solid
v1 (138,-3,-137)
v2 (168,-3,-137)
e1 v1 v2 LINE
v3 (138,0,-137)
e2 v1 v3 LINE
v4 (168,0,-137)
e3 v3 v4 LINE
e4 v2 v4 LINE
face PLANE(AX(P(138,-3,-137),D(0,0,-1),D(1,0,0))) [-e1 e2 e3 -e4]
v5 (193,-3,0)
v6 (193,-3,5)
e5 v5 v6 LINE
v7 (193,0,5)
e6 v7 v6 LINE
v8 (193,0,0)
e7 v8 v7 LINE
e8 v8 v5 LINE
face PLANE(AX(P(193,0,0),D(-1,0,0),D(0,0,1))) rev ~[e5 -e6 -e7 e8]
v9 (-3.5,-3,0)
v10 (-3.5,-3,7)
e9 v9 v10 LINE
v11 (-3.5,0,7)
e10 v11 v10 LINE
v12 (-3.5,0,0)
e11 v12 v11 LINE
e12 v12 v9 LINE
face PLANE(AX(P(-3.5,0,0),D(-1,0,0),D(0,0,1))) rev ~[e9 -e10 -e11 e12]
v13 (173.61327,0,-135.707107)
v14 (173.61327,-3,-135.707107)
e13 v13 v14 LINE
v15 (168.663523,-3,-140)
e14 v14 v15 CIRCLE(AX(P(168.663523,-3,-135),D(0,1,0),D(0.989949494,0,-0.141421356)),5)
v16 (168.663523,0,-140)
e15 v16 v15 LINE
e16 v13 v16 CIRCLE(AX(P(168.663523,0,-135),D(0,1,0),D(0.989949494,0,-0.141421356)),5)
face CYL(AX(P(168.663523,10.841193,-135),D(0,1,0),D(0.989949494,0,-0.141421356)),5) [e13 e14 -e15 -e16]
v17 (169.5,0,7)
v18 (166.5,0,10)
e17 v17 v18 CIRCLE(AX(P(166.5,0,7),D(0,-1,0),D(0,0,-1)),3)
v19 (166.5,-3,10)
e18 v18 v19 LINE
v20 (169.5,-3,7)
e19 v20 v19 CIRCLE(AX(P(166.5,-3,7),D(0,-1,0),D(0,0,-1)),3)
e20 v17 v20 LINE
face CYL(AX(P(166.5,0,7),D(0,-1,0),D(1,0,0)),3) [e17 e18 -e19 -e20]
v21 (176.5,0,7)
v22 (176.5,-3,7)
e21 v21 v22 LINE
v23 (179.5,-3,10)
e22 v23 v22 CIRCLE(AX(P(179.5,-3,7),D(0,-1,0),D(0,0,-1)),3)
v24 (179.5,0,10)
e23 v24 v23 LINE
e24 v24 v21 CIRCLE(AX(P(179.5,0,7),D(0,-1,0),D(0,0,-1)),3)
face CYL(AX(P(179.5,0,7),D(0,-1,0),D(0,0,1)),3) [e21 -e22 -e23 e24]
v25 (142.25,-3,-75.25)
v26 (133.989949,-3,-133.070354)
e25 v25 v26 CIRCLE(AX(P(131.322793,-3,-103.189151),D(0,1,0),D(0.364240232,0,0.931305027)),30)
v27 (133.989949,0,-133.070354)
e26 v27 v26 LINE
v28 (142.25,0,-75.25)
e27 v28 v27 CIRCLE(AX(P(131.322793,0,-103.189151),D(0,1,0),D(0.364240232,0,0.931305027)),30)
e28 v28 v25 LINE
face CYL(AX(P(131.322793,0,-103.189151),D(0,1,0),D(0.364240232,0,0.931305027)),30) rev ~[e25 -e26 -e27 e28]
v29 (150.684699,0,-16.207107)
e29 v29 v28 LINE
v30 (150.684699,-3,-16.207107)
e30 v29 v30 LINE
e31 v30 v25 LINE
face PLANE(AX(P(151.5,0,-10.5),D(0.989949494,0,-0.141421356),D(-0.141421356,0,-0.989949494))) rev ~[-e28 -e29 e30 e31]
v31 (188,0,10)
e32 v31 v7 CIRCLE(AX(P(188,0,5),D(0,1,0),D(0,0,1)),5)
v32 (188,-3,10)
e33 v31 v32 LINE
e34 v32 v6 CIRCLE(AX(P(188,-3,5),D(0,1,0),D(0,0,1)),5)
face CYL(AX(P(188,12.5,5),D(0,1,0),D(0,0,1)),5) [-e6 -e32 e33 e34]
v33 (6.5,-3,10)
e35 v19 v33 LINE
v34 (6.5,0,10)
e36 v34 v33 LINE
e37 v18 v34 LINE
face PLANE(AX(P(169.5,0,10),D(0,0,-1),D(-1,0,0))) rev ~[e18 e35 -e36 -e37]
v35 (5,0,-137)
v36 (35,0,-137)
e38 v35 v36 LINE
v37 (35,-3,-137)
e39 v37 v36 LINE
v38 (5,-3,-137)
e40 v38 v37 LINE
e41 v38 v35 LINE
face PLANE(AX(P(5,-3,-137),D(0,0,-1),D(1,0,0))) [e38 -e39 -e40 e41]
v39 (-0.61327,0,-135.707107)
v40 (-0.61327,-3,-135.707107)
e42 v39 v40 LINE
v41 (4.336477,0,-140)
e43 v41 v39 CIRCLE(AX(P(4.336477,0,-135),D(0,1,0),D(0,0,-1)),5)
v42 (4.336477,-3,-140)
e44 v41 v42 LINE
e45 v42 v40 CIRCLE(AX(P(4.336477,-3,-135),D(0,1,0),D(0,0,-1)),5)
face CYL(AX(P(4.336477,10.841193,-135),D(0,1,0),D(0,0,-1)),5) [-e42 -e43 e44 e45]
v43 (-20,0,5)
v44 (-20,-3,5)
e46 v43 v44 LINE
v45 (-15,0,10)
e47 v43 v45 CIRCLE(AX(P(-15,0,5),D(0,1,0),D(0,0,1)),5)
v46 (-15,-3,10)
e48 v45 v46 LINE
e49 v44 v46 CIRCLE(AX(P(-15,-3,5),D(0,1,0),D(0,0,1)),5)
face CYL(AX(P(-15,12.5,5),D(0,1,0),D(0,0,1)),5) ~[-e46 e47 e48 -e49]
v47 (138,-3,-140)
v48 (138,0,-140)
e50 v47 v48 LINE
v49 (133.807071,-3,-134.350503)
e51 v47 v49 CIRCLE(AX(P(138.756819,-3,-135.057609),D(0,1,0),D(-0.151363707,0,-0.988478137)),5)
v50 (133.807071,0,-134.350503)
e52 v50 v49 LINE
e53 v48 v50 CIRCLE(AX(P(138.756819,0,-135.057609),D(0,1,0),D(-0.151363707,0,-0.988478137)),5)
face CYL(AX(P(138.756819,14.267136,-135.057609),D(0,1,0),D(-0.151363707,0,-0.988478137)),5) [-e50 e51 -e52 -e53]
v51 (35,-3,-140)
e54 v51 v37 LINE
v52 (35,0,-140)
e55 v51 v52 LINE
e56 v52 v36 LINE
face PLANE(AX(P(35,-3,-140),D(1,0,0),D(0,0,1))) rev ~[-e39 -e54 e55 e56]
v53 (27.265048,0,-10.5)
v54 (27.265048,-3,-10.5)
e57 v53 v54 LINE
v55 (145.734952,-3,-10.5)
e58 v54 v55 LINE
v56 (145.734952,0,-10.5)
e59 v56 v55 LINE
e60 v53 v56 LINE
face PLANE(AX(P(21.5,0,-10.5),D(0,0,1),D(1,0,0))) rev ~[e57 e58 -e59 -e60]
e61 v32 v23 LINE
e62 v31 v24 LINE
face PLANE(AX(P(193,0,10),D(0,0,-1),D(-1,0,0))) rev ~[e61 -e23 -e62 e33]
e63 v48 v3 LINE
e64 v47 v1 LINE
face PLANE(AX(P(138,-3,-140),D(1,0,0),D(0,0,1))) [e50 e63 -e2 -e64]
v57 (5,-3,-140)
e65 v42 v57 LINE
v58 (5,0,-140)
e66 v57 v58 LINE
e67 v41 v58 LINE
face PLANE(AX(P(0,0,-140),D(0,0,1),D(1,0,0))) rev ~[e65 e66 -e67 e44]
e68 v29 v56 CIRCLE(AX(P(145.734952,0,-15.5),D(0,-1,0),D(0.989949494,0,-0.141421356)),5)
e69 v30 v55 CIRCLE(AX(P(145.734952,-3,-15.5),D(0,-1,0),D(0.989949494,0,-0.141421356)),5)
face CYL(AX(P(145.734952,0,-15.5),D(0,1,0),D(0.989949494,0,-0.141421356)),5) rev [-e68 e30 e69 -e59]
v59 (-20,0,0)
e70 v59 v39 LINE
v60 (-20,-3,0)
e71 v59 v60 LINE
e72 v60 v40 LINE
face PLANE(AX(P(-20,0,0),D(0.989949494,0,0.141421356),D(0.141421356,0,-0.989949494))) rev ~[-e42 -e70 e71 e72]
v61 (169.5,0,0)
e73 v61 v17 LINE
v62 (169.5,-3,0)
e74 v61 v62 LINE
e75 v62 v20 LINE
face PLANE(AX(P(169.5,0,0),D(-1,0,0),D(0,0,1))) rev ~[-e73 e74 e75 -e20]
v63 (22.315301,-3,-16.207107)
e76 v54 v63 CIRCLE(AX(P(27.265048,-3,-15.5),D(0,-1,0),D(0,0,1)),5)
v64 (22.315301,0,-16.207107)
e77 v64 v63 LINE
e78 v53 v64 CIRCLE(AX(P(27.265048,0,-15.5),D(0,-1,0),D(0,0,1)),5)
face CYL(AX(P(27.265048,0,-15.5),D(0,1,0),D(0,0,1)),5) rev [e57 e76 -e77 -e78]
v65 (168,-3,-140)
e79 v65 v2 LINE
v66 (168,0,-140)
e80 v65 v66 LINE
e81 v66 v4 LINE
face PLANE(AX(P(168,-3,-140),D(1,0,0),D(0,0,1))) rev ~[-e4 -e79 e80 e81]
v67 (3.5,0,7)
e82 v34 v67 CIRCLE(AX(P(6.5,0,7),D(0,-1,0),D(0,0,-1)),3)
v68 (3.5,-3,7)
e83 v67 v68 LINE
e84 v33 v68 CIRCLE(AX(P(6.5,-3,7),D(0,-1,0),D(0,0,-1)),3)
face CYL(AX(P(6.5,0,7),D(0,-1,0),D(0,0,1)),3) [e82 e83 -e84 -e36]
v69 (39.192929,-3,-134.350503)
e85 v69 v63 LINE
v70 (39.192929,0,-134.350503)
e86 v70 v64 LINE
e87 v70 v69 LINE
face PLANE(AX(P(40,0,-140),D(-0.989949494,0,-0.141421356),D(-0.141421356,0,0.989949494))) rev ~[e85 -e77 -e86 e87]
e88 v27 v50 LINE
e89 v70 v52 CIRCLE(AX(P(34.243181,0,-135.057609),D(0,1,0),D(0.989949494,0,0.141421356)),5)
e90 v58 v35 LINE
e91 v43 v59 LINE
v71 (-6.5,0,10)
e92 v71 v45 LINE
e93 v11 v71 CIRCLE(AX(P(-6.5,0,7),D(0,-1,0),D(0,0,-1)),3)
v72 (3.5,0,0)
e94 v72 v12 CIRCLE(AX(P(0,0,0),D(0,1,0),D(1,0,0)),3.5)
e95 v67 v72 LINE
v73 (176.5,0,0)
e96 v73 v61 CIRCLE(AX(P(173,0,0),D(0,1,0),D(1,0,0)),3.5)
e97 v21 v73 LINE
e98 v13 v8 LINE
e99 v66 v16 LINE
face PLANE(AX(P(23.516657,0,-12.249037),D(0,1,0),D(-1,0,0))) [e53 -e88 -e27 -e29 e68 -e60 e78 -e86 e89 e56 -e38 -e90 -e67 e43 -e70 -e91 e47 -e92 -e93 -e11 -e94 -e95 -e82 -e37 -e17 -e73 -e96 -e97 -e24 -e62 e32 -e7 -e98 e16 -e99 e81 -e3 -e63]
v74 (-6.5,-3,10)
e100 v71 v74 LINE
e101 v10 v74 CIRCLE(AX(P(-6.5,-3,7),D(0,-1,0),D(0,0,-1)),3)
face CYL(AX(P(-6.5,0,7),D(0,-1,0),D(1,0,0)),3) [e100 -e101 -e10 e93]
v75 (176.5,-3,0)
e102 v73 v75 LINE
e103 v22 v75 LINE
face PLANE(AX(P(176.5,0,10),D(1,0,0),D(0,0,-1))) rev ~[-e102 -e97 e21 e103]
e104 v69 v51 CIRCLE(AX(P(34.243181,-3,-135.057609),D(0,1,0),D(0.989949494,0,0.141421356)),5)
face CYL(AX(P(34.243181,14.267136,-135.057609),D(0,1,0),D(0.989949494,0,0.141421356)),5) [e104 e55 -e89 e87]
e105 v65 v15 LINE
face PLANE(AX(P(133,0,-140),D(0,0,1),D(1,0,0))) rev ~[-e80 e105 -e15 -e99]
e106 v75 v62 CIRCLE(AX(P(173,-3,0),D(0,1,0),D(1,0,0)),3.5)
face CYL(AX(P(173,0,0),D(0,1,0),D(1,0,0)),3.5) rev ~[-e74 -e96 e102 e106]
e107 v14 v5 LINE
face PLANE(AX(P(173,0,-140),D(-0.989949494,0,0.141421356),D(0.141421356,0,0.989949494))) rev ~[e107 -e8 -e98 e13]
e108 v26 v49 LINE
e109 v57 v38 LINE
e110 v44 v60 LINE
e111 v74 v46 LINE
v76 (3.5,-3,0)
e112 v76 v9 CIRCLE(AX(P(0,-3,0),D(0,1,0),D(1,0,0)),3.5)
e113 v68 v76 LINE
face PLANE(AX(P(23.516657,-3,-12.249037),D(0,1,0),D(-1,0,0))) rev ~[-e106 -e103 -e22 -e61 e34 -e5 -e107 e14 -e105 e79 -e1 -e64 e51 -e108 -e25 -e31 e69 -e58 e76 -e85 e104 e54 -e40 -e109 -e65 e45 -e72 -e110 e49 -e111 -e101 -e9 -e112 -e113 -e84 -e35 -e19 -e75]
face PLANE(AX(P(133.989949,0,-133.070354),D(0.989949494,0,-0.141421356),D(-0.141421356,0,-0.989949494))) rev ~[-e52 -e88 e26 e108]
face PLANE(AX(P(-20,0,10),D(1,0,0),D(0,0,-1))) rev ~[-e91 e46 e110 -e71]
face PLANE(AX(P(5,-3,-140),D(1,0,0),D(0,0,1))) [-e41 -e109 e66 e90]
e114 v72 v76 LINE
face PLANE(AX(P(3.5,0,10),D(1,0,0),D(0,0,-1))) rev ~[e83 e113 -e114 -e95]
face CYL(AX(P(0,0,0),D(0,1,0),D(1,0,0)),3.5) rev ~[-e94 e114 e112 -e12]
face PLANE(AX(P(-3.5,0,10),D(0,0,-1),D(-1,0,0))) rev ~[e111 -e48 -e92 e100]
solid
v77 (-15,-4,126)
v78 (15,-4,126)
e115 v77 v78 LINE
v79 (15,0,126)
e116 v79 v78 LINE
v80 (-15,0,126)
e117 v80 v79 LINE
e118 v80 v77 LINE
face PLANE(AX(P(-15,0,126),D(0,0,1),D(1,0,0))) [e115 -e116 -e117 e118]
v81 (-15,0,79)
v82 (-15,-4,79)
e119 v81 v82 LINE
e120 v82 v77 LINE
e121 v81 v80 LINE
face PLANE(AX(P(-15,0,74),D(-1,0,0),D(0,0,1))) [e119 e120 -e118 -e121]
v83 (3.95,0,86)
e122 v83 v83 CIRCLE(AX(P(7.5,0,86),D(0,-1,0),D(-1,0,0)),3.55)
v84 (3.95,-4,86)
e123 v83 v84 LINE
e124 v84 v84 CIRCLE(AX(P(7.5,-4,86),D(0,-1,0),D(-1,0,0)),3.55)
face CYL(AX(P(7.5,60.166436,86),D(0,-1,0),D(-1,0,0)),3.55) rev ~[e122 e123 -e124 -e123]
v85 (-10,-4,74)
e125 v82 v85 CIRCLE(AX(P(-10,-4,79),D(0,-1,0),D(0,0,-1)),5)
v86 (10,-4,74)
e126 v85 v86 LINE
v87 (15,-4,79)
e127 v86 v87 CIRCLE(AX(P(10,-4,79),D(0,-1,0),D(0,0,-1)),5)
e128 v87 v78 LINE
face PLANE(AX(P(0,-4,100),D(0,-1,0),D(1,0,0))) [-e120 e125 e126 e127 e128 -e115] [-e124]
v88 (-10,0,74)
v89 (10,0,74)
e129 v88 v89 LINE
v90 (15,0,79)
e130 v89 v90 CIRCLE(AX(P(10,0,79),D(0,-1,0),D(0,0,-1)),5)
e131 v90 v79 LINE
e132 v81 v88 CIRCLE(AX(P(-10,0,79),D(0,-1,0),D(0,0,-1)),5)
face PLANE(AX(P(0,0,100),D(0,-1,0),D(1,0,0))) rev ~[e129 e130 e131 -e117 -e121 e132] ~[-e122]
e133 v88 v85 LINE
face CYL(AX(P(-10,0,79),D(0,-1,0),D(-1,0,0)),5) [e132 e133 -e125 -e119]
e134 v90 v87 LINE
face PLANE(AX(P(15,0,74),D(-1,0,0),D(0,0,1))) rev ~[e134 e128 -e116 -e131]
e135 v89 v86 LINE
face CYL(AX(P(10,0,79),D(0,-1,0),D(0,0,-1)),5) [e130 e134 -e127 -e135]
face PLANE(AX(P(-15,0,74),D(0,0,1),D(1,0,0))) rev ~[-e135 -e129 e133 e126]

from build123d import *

# Parameters (mm, degrees)
F1_DEPTH     = 3
F2_W         = 30
F2_H         = 3
F3_DEPTH     = 25
F4_W         = 30
F4_H         = 52
F5_DEPTH     = 4
F6_D         = 7.1
F7_T1_DEPTH  = 3
F7_T3_DEPTH  = 3
F7_T5_DEPTH  = 28
F7_T7_DEPTH  = 28
F7_T9_DEPTH  = 24.6823850424
F7_T11_DEPTH = 31.5342712156
F7_T13_DEPTH = 31.5342712156
F7_T15_DEPTH = 24.6823850424
F8_R         = 3
F9_R         = 5


# Not quite as in the source:
# - a fillet or chamfer that OpenCascade refuses, or shapes differently, is made with other operations: its cross-section is extruded or revolved along the edge and cut away or added


with BuildPart() as f1:
    # F0 (on Front) → F1 (new body)
    with BuildSketch(Plane.XZ):
        with BuildLine():
            Line((-20, 10), (-20, 0))
            Line((-20, 0), (0, -140))
            Line((0, -140), (40, -140))
            Line((40, -140), (21.5, -10.5))
            Line((21.5, -10.5), (151.5, -10.5))
            Line((151.5, -10.5), (142.25, -75.25))
            ThreePointArc((142.25, -75.25), (161.0212778612, -107.4317915028), (133.9899494937, -133.0703535444))
            Line((133.9899494937, -133.0703535444), (133, -140))
            Line((133, -140), (173, -140))
            Line((173, -140), (193, 0))
            Line((193, 0), (193, 10))
            Line((193, 10), (176.5, 10))
            Line((176.5, 10), (176.5, 0))
            ThreePointArc((176.5, 0), (173, -3.5), (169.5, 0))
            Line((169.5, 0), (169.5, 10))
            Line((169.5, 10), (153, 10))
            Line((153, 10), (20, 10))
            Line((20, 10), (3.5, 10))
            Line((3.5, 10), (3.5, 0))
            ThreePointArc((3.5, 0), (0, -3.5), (-3.5, 0))
            Line((-3.5, 0), (-3.5, 10))
            Line((-3.5, 10), (-20, 10))
        make_face()
    extrude(amount=F1_DEPTH)

    # F2 (on face) → F3 (cut)
    with BuildSketch(Plane.XZ.offset(3)):
        with Locations((20, -138.5)):
            Rectangle(F2_W, F2_H)
        with Locations((153, -138.5)):
            Rectangle(F2_W, F2_H)
    extrude(amount=-F3_DEPTH, mode=Mode.SUBTRACT)

    # F7: fillet of radius 5 on 8 edges, made by hand

    # F7_s2 → F7_t1 (join)
    with BuildSketch(Plane.XZ):
        with BuildLine():
            ThreePointArc((150.6846990313, -16.2071067812), (149.5122213379, -12.2239912932), (145.734951563, -10.5))
            Line((145.734951563, -10.5), (151.5, -10.5))
            Line((151.5, -10.5), (150.6846990313, -16.2071067812))
        make_face()
    extrude(amount=F7_T1_DEPTH)

    # F7_s4 → F7_t3 (join)
    with BuildSketch(Plane.XZ):
        with BuildLine():
            ThreePointArc((27.265048437, -10.5), (23.4877786621, -12.2239912932), (22.3153009687, -16.2071067812))
            Line((22.3153009687, -16.2071067812), (21.5, -10.5))
            Line((21.5, -10.5), (27.265048437, -10.5))
        make_face()
    extrude(amount=F7_T3_DEPTH)

    # F7_s6 → F7_t5 (cut)
    with BuildSketch(Plane.XZ.offset(-12.5)):
        with BuildLine():
            ThreePointArc((-15, 10), (-18.5355339059, 8.5355339059), (-20, 5))
            Line((-20, 5), (-20, 10))
            Line((-20, 10), (-15, 10))
        make_face()
    extrude(amount=F7_T5_DEPTH, mode=Mode.SUBTRACT)

    # F7_s8 → F7_t7 (cut)
    with BuildSketch(Plane.XZ.offset(-12.5)):
        with BuildLine():
            ThreePointArc((188, 10), (191.5355339059, 8.5355339059), (193, 5))
            Line((193, 5), (193, 10))
            Line((193, 10), (188, 10))
        make_face()
    extrude(amount=F7_T7_DEPTH, mode=Mode.SUBTRACT)

    # F7_s10 → F7_t9 (cut)
    with BuildSketch(Plane.XZ.offset(-10.8411925212)):
        with BuildLine():
            ThreePointArc((173.6132704598, -135.7071067812), (171.9395316983, -138.777269775), (168.6635229915, -140))
            Line((168.6635229915, -140), (173, -140))
            Line((173, -140), (173.6132704598, -135.7071067812))
        make_face()
    extrude(amount=F7_T9_DEPTH, mode=Mode.SUBTRACT)

    # F7_s12 → F7_t11 (cut)
    with BuildSketch(Plane.XZ.offset(-14.2671356078)):
        with BuildLine():
            ThreePointArc((138, -140), (134.7417930933, -138.0374701654), (133.8070710669, -134.3505025316))
            Line((133.8070710669, -134.3505025316), (133, -140))
            Line((133, -140), (138, -140))
        make_face()
    extrude(amount=F7_T11_DEPTH, mode=Mode.SUBTRACT)

    # F7_s14 → F7_t13 (cut)
    with BuildSketch(Plane.XZ.offset(-14.2671356078)):
        with BuildLine():
            ThreePointArc((39.1929289331, -134.3505025316), (38.2582069067, -138.0374701654), (35, -140))
            Line((35, -140), (40, -140))
            Line((40, -140), (39.1929289331, -134.3505025316))
        make_face()
    extrude(amount=F7_T13_DEPTH, mode=Mode.SUBTRACT)

    # F7_s16 → F7_t15 (cut)
    with BuildSketch(Plane.XZ.offset(-10.8411925212)):
        with BuildLine():
            ThreePointArc((4.3364770085, -140), (1.0604683017, -138.777269775), (-0.6132704598, -135.7071067812))
            Line((-0.6132704598, -135.7071067812), (0, -140))
            Line((0, -140), (4.3364770085, -140))
        make_face()
    extrude(amount=F7_T15_DEPTH, mode=Mode.SUBTRACT)

    # F8
    f8_edges = [f1.edges().sort_by_distance(p)[0] for p in [
        (169.5, -1.5, 10),
        (176.5, -1.5, 10),
        (-3.5, -1.5, 10),
        (3.5, -1.5, 10),
    ]]
    fillet(f8_edges, radius=F8_R)


with BuildPart() as f5:
    # F4 (on Front) → F5 (new body)
    with BuildSketch(Plane.XZ):
        with Locations((0, 100)):
            Rectangle(F4_W, F4_H)
    extrude(amount=F5_DEPTH)

    # F6 (through all)
    with Locations(Plane(origin=(0, 0, 0), x_dir=(1, 0, 0), z_dir=(0, 1, 0))):
        with Locations((7.5, -86)):
            Hole(F6_D / 2)

    # F9
    f9_edges = [f5.edges().sort_by_distance(p)[0] for p in [
        (-15, -2, 74),
        (15, -2, 74),
    ]]
    fillet(f9_edges, radius=F9_R)


solid = Compound([f1.part, f5.part])
